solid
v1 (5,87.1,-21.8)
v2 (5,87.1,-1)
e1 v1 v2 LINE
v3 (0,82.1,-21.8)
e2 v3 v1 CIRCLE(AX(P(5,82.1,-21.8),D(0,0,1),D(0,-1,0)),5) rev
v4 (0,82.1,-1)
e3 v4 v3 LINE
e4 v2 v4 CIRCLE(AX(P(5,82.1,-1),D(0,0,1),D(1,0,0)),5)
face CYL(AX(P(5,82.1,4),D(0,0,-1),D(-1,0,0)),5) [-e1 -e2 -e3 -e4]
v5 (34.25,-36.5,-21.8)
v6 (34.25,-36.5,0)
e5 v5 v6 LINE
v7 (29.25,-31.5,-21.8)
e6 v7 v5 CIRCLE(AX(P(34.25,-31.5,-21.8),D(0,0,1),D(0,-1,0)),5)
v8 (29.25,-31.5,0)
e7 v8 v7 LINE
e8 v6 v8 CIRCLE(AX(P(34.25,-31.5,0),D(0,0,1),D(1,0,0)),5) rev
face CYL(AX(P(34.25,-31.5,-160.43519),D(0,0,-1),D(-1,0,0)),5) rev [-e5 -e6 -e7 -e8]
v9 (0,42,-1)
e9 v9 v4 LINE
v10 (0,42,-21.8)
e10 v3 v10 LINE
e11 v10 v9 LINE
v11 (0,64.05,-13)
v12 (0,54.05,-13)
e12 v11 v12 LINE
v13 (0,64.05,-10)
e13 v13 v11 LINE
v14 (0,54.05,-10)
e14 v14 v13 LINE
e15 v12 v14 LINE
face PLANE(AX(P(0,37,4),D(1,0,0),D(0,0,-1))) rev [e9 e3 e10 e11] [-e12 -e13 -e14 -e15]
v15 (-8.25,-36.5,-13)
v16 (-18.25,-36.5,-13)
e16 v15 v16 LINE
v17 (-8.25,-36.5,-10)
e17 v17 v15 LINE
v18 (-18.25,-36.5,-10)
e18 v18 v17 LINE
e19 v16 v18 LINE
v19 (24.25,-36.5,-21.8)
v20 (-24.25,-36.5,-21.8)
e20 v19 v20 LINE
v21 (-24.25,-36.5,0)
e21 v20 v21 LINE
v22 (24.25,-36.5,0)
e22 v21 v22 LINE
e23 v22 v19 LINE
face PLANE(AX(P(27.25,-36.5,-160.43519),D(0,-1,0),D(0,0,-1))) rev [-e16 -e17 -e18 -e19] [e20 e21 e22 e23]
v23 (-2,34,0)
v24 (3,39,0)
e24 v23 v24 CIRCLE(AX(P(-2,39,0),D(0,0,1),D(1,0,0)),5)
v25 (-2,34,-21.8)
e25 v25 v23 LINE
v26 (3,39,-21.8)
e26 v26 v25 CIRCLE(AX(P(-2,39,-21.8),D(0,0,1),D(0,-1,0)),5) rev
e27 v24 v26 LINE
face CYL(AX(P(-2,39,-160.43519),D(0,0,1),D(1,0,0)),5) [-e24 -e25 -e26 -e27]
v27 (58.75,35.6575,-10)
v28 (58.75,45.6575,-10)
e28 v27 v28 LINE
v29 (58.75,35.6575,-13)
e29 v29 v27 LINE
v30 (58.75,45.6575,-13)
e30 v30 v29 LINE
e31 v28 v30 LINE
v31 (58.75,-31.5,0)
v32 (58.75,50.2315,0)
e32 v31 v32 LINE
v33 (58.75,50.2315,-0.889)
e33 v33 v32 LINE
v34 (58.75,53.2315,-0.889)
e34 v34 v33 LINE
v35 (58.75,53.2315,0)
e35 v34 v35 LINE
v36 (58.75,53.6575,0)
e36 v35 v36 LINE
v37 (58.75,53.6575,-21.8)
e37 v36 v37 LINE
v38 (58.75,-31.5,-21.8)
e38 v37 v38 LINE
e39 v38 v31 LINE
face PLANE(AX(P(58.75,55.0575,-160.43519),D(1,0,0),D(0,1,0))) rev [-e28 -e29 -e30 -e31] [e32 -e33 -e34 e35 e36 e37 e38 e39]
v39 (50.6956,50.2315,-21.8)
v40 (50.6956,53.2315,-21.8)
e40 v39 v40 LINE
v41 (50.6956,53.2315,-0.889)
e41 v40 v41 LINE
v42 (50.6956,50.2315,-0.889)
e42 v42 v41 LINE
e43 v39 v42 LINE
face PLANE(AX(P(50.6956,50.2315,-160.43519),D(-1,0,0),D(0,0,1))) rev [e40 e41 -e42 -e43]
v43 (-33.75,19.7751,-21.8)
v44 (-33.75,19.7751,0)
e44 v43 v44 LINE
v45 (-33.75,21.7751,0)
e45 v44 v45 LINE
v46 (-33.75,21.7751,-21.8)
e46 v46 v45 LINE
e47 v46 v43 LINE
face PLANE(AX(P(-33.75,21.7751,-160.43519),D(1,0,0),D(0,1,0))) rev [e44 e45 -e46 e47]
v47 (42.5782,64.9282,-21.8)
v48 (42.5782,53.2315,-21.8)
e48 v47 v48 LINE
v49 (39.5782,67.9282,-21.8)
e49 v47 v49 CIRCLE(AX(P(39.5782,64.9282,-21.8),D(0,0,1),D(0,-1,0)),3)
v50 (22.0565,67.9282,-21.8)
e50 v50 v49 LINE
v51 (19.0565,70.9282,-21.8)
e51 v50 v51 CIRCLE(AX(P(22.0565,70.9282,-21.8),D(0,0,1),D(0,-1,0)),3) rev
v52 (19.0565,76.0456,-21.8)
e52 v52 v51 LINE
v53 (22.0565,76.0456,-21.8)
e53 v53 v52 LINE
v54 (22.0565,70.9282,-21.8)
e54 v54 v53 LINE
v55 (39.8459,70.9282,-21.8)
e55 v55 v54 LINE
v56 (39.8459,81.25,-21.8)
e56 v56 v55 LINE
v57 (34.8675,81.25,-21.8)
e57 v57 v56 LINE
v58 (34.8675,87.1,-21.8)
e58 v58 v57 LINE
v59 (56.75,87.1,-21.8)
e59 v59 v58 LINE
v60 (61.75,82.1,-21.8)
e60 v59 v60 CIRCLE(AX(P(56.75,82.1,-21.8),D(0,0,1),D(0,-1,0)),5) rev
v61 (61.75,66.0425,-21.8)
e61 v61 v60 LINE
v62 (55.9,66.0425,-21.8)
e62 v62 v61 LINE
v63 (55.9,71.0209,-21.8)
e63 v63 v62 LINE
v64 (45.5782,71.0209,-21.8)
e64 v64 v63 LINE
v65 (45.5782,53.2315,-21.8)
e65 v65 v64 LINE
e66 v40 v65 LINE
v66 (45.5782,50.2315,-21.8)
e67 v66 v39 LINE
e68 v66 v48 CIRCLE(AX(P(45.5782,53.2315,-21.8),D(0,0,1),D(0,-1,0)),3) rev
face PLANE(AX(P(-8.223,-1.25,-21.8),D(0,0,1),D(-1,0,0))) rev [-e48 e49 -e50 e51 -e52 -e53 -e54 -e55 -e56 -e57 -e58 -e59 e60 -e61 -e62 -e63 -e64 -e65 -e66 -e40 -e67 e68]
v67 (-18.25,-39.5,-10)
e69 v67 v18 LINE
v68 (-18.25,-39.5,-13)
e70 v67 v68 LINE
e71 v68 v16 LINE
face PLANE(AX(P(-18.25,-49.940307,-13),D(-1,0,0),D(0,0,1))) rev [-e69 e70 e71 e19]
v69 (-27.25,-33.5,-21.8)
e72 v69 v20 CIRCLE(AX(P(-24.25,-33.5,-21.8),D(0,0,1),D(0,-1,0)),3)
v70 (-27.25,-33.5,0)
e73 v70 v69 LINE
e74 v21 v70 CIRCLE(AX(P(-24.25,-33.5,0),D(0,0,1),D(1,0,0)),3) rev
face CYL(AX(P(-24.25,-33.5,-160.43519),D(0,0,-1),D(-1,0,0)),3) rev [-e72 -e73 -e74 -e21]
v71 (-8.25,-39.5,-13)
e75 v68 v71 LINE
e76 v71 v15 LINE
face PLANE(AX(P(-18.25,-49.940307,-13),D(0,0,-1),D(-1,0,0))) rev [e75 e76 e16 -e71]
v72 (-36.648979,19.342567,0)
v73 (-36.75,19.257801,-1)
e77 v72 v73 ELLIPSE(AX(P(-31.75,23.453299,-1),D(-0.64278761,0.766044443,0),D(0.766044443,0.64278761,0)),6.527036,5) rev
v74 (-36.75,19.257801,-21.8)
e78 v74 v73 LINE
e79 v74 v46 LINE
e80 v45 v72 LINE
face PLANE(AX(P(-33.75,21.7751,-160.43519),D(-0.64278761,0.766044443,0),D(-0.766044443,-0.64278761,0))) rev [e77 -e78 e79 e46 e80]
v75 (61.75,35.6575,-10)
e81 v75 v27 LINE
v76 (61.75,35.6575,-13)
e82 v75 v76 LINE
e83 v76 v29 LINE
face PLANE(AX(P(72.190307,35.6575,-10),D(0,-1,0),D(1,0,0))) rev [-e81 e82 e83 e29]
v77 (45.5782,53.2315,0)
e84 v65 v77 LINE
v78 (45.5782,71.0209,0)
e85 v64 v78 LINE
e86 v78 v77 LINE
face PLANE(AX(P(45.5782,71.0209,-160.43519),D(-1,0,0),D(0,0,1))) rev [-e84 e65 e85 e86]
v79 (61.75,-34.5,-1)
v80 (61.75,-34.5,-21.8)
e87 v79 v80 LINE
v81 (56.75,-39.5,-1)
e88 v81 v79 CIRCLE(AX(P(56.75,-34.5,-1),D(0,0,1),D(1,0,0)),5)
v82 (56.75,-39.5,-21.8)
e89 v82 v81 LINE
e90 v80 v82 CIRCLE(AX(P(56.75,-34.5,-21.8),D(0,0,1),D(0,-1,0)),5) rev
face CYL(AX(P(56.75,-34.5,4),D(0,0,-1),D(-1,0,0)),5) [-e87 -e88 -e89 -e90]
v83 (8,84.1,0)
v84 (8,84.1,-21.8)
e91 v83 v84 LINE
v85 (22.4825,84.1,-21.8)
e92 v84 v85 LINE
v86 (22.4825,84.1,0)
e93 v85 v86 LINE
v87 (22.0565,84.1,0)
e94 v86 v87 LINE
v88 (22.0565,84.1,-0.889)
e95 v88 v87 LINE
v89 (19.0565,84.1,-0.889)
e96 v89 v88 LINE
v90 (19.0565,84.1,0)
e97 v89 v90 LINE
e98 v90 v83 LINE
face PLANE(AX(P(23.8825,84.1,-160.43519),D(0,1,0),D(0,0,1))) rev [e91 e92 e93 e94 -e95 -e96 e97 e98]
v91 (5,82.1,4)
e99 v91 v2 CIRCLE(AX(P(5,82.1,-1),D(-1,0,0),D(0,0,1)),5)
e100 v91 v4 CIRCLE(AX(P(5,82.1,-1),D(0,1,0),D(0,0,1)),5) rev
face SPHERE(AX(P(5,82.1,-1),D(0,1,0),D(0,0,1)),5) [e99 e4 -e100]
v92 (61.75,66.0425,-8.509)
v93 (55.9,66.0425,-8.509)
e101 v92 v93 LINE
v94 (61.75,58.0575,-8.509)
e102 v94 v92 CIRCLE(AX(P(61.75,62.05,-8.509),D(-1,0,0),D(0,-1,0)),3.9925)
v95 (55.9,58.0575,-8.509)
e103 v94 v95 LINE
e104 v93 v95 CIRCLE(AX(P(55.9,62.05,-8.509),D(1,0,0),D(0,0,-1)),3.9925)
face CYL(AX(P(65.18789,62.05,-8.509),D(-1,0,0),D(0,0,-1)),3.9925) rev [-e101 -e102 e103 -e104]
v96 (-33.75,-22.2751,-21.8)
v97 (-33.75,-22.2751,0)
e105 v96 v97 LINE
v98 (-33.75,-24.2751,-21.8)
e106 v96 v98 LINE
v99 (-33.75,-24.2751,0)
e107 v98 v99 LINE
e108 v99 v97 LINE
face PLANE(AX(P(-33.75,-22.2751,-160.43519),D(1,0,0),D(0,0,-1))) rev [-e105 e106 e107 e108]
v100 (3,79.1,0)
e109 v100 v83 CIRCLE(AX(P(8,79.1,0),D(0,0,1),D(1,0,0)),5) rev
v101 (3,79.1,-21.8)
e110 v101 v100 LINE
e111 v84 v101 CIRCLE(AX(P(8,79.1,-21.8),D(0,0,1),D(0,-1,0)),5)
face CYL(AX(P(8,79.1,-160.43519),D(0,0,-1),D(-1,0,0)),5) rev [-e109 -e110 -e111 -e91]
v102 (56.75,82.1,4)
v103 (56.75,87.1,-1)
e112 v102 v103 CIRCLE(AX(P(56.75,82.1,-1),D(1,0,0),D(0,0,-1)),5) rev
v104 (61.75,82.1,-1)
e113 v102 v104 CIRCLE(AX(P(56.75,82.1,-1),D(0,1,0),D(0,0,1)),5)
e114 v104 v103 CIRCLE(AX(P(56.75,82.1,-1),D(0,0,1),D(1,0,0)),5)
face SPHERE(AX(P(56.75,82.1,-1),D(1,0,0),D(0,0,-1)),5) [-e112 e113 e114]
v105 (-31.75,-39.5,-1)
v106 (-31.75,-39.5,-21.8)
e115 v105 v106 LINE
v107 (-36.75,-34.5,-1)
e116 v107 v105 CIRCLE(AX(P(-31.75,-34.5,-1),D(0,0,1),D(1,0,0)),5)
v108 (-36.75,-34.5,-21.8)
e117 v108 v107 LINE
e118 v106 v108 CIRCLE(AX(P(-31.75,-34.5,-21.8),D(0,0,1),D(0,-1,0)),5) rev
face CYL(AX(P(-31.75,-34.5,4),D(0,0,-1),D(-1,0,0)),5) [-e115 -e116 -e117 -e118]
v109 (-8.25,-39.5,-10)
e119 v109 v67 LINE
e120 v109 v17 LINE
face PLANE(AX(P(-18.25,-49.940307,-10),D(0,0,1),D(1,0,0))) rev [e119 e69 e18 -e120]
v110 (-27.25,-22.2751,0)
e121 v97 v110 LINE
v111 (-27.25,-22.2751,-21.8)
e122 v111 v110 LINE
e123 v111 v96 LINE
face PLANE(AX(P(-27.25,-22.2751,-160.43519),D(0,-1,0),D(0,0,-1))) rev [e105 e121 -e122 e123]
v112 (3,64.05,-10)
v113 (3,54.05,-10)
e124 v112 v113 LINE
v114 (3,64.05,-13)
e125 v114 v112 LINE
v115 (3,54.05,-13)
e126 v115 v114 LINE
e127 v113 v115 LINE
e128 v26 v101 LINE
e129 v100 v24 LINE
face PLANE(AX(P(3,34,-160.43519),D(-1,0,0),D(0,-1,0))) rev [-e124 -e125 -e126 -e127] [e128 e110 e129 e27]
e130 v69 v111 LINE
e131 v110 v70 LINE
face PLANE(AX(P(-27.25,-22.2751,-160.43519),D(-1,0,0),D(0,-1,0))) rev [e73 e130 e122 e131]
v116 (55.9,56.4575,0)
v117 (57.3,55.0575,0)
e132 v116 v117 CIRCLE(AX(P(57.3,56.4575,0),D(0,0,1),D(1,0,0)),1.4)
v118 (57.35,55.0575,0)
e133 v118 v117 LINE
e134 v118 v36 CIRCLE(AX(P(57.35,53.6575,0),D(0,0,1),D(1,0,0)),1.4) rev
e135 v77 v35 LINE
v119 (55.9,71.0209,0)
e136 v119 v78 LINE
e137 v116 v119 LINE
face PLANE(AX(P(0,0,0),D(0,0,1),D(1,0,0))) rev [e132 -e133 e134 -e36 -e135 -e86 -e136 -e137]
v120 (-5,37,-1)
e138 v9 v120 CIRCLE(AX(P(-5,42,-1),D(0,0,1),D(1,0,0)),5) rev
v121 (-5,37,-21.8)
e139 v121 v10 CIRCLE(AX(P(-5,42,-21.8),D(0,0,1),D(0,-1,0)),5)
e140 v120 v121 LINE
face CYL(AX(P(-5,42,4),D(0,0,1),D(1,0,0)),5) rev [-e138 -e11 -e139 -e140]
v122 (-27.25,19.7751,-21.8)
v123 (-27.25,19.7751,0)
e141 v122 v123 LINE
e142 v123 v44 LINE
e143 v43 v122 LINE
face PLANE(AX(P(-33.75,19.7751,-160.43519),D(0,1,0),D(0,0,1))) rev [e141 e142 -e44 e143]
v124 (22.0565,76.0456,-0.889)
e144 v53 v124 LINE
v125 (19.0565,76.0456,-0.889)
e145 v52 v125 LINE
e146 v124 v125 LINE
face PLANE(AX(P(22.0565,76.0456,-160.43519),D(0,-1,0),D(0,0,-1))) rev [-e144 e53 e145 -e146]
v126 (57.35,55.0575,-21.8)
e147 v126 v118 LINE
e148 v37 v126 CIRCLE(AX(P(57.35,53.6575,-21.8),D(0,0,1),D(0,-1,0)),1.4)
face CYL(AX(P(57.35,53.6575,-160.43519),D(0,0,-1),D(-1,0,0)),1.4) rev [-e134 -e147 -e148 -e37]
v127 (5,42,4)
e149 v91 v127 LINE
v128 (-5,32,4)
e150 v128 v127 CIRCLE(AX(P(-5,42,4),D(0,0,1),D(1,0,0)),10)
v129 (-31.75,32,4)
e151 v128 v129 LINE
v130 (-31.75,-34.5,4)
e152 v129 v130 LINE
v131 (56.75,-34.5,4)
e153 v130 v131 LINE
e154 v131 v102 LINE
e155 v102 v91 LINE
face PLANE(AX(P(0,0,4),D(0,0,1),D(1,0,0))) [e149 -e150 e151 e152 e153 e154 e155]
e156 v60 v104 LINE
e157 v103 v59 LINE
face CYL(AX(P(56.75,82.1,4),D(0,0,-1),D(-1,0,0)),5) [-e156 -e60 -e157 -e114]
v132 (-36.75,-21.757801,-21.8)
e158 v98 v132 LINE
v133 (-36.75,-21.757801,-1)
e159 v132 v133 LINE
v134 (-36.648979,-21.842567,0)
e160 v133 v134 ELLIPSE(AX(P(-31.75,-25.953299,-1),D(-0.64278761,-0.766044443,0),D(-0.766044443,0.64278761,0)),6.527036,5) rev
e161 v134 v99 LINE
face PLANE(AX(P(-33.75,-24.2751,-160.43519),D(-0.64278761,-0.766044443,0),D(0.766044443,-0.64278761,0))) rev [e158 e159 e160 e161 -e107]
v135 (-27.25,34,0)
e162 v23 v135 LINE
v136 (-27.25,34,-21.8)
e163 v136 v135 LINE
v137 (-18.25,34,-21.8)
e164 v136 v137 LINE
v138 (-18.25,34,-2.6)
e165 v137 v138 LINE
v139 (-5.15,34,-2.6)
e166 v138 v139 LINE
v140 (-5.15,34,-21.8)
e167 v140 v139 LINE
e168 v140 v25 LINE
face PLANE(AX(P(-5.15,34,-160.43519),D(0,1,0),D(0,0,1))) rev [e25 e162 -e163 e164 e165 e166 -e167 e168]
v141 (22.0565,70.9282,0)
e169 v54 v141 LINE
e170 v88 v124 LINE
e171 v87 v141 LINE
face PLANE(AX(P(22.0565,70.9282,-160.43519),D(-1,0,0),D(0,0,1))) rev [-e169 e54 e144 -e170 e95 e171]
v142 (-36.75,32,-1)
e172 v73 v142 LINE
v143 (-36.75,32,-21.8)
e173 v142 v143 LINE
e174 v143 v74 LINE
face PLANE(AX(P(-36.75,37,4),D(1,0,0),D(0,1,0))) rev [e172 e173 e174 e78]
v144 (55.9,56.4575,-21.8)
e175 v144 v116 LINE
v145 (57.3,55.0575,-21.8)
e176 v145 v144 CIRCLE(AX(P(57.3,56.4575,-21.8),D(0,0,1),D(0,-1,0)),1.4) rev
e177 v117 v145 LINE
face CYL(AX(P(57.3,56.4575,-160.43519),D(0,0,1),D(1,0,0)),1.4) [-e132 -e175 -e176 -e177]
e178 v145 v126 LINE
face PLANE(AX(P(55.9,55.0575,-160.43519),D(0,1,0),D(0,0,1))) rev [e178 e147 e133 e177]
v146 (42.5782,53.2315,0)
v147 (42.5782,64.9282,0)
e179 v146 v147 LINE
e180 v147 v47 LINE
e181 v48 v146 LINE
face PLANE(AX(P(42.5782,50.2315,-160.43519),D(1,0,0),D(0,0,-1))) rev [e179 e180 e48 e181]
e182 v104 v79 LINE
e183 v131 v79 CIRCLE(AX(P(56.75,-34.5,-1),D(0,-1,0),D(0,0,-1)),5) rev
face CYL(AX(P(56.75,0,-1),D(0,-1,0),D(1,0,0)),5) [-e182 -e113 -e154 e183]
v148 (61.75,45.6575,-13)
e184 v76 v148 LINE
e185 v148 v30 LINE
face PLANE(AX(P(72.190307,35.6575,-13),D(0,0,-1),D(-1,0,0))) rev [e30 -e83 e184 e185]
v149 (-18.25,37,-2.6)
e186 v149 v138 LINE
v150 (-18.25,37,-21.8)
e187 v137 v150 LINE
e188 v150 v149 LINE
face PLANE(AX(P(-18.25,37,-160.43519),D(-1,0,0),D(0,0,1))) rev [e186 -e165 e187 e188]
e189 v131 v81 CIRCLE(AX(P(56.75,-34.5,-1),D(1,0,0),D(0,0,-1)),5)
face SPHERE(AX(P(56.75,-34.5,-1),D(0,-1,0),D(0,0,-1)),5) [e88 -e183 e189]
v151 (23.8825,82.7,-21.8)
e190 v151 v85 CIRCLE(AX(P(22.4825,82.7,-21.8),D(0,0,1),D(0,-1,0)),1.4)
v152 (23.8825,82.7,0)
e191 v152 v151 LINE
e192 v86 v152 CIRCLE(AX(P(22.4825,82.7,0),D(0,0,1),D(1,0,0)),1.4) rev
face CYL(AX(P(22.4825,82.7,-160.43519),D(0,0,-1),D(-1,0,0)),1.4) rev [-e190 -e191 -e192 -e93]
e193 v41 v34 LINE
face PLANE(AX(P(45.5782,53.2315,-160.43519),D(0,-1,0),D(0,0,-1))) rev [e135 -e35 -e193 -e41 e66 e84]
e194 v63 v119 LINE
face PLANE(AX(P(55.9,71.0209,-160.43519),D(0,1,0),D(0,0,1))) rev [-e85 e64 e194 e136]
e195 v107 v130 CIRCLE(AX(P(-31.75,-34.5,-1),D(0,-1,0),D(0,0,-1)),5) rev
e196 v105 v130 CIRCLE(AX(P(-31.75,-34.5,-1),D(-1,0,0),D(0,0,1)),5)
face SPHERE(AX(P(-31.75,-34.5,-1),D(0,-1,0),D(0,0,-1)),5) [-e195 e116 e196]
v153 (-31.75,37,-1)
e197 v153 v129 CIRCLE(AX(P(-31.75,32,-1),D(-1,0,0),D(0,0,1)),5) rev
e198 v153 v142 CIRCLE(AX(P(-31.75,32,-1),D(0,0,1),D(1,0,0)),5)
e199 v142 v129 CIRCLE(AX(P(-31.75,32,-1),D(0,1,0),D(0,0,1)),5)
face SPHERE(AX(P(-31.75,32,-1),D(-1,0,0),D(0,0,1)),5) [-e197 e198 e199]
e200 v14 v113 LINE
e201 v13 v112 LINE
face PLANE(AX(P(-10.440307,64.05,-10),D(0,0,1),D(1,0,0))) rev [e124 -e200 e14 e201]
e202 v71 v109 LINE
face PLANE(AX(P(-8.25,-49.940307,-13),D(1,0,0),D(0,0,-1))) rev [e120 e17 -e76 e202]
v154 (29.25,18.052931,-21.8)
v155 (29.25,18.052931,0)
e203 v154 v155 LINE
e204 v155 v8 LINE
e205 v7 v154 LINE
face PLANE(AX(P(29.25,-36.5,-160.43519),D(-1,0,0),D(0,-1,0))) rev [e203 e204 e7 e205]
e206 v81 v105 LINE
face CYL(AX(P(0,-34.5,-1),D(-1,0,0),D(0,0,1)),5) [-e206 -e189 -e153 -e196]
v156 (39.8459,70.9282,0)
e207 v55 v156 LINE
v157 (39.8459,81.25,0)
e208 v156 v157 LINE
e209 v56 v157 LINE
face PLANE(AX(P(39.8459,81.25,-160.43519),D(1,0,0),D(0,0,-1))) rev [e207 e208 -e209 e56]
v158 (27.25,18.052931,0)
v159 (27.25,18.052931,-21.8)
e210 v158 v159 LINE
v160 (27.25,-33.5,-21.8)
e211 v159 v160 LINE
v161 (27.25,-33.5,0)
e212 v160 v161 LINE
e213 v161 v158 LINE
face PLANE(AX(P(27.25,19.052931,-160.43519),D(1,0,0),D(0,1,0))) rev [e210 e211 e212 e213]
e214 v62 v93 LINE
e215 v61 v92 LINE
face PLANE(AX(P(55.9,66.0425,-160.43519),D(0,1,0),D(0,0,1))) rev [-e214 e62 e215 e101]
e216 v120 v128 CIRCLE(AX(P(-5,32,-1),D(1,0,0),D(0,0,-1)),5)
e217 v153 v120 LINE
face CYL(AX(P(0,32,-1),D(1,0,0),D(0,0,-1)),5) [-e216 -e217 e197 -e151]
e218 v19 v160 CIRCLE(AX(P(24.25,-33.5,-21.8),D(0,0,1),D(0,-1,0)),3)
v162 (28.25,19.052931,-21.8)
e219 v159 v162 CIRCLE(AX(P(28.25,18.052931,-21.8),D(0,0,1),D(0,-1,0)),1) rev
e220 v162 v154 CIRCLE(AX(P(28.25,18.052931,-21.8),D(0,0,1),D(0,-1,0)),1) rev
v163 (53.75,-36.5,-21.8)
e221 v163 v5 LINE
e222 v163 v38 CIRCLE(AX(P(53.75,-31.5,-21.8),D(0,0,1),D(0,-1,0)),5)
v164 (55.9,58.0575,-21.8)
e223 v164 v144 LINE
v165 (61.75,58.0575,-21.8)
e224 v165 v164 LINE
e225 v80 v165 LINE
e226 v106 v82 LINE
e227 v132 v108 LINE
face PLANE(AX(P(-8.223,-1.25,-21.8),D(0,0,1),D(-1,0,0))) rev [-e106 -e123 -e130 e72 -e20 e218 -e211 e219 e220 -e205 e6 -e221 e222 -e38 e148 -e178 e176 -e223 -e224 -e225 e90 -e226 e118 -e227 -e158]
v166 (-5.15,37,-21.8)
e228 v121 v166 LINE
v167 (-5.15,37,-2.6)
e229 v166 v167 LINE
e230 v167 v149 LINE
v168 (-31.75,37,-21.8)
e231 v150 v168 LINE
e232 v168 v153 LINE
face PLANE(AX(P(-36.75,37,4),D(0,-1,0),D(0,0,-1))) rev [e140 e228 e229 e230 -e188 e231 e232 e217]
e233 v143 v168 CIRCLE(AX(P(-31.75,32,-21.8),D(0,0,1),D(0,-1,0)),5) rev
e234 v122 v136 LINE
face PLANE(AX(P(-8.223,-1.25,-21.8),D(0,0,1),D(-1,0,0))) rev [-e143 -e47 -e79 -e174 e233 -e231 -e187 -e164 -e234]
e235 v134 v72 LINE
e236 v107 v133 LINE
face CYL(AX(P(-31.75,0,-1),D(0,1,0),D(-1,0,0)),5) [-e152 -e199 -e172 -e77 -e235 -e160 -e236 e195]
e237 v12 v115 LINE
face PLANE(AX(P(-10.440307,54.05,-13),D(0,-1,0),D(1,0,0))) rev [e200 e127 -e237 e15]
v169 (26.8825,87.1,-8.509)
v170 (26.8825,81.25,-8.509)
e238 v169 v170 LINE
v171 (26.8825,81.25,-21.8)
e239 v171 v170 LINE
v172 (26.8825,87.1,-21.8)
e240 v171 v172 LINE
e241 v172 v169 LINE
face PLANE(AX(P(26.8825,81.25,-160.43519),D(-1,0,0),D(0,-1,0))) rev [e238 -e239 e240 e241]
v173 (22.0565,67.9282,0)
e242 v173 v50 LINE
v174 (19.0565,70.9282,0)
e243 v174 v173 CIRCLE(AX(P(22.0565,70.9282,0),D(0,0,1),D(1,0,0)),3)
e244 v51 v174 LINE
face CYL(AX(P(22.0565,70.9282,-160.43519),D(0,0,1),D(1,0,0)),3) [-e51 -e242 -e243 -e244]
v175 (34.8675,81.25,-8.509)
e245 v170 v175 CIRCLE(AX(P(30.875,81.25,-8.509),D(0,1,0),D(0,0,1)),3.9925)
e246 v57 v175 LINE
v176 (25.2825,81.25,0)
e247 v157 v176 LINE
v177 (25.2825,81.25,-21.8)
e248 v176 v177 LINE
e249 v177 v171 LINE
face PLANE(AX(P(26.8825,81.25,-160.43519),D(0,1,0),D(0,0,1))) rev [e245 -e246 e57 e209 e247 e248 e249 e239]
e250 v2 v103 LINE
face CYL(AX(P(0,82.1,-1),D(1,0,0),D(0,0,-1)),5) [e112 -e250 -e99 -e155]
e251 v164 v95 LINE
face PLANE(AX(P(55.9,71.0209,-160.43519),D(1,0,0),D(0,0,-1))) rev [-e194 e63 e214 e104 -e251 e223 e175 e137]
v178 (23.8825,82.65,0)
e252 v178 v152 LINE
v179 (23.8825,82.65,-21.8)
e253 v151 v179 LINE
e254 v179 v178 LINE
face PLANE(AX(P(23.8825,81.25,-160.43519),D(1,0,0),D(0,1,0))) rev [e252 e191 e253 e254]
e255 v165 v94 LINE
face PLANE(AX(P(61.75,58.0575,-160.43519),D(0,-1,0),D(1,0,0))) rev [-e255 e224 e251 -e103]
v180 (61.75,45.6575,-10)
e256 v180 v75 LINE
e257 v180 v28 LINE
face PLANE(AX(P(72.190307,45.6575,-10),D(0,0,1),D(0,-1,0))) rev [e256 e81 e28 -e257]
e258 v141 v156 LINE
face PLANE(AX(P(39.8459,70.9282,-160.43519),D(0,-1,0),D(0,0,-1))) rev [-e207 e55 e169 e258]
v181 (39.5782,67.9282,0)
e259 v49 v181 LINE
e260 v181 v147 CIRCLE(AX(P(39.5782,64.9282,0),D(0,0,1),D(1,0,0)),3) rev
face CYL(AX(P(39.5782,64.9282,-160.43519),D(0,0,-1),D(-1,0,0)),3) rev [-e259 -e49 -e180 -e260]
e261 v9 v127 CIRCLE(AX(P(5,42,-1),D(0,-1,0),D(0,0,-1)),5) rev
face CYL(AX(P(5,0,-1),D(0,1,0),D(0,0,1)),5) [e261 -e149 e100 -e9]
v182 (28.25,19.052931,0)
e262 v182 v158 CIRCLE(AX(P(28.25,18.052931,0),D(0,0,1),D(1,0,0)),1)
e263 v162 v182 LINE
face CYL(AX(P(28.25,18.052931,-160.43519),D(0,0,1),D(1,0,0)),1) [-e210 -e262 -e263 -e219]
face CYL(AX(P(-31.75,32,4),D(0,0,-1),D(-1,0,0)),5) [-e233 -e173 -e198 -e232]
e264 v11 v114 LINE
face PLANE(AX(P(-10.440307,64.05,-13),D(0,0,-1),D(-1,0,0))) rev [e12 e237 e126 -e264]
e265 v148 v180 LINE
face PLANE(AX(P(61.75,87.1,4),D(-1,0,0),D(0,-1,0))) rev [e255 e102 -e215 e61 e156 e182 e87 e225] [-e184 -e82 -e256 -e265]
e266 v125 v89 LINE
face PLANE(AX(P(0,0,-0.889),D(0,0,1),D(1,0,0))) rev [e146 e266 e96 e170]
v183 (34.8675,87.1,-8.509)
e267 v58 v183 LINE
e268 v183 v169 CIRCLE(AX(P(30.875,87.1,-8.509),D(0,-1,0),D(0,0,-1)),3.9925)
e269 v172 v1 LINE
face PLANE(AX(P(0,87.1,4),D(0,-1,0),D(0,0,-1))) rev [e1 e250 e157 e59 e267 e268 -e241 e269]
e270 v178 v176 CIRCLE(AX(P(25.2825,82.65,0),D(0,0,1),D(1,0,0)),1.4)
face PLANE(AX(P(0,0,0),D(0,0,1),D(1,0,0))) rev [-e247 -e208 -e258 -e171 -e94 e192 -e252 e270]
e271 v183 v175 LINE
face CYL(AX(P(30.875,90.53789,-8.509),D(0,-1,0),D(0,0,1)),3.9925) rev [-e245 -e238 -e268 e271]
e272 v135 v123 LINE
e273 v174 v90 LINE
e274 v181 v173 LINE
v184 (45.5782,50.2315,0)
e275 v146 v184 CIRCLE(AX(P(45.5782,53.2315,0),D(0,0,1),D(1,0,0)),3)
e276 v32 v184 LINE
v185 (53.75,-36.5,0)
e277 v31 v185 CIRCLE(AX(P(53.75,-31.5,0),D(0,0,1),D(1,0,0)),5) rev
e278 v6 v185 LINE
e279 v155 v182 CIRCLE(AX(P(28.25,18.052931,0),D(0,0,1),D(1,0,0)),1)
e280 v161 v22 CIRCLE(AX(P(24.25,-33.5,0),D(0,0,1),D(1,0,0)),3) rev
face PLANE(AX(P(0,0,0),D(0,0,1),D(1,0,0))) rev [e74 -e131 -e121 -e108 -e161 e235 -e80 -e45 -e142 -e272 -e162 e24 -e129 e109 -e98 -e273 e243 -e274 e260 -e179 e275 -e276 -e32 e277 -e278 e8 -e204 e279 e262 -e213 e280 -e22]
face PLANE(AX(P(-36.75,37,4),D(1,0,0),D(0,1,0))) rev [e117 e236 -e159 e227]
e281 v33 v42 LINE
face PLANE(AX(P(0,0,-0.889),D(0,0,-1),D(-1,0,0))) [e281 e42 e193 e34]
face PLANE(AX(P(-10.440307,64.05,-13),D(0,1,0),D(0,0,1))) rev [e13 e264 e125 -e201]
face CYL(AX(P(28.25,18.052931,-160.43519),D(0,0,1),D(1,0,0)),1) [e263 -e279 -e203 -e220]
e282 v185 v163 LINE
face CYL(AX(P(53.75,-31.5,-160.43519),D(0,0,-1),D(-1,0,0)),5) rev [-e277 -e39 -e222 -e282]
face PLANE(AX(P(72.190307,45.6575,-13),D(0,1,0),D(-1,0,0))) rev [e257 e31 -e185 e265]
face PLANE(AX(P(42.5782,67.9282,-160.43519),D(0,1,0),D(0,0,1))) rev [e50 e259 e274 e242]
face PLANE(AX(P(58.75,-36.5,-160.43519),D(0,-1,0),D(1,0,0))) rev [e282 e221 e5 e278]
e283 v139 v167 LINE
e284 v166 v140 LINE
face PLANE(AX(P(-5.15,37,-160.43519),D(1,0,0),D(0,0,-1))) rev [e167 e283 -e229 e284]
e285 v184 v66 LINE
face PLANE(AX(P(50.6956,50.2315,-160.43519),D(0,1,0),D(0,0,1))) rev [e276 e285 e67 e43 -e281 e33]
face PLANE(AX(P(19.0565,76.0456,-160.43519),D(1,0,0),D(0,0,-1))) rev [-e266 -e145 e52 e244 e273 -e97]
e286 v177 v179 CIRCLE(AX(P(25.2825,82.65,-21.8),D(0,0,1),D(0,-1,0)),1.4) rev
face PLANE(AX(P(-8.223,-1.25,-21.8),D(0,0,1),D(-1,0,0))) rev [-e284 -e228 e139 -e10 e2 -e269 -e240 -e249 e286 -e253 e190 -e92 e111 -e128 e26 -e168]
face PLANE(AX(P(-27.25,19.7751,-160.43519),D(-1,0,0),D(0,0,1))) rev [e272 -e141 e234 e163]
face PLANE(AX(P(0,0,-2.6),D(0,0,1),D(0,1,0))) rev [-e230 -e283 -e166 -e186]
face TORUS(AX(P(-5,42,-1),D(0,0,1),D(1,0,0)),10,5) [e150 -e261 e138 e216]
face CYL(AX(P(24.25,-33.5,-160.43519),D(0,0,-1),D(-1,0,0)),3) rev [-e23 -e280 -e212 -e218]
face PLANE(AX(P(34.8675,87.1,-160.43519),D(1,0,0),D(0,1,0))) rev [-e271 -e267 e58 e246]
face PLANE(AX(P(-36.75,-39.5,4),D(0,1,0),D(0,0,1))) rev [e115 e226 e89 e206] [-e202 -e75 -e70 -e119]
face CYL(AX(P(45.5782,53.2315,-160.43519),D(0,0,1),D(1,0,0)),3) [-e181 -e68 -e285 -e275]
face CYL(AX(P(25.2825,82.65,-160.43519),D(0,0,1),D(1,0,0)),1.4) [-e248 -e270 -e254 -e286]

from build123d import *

# Parameters (mm, degrees)
BOSS_EXTRUDE1_DEPTH = 4
BOSS_EXTRUDE2_DEPTH = 21.8
BOSS_EXTRUDE3_START = 55.9
BOSS_EXTRUDE3_DEPTH = 5.85
BOSS_EXTRUDE4_START = 81.25
BOSS_EXTRUDE4_DEPTH = 5.85
SKETCH5_W           = 13.1
SKETCH5_H           = 3
BOSS_EXTRUDE5_DEPTH = 2.6
FILLET1_R           = 5
FILLET2_R           = 3
SKETCH6_W           = 3
SKETCH6_H           = 8.0544
SKETCH6_W_2         = 8.0544
SKETCH6_H_2         = 3
BOSS_EXTRUDE6_DEPTH = 0.889
FILLET3_R           = 3
FILLET4_R           = 1.4
FILLET5_R           = 1
SKETCH8_W           = 3
SKETCH8_H           = 10
CUT_EXTRUDE1_DEPTH  = 3
SKETCH9_W           = 3
SKETCH9_H           = 10
CUT_EXTRUDE2_DEPTH  = 3
SKETCH10_W          = 10
SKETCH10_H          = 3
CUT_EXTRUDE3_DEPTH  = 3


# Read off the part's stored shape, not the designer's step: Boss-Extrude3, Boss-Extrude4
# Some blends are built 0.0001 mm under size
with BuildPart() as part:
    # Sketch1 → Boss-Extrude1 (new body)
    with BuildSketch(Plane.XY):
        Polygon((-36.75, 37), (-36.75, -39.5), (61.75, -39.5), (61.75, 87.1), (0, 87.1), (0, 37), align=None)
    extrude(amount=BOSS_EXTRUDE1_DEPTH)

    # Sketch2 → Boss-Extrude2 (add)
    with BuildSketch(Plane(origin=(0, 0, 0), x_dir=(-1, 0, 0), z_dir=(0, 0, -1))):
        Polygon((5.15, 34), (-3, 34), (-3, 84.1), (-23.8825, 84.1), (-23.8825, 81.25), (-26.8825, 81.25), (-26.8825, 87.1), (0, 87.1), (0, 37), (5.15, 37), align=None)
        Polygon((-34.8675, 87.1), (-34.8675, 81.25), (-39.8459, 81.25), (-39.8459, 70.9282), (-22.0565, 70.9282), (-22.0565, 76.0456), (-19.0565, 76.0456), (-19.0565, 67.9282), (-42.5782, 67.9282), (-42.5782, 50.2315), (-50.6956, 50.2315), (-50.6956, 53.2315), (-45.5782, 53.2315), (-45.5782, 71.0209), (-55.9, 71.0209), (-55.9, 66.0425), (-61.75, 66.0425), (-61.75, 87.1), align=None)
        Polygon((-61.75, 58.0575), (-55.9, 58.0575), (-55.9, 55.0575), (-58.75, 55.0575), (-58.75, -36.5), (-29.25, -36.5), (-29.25, 19.052930988), (-27.25, 19.052930988), (-27.25, -36.5), (27.25, -36.5), (27.25, -22.2751), (33.75, -22.2751), (33.75, -24.2751), (36.75, -21.757801106), (36.75, -39.5), (-61.75, -39.5), align=None)
        Polygon((18.25, 37), (18.25, 34), (27.25, 34), (27.25, 19.7751), (33.75, 19.7751), (33.75, 21.7751), (36.75, 19.257801106), (36.75, 37), align=None)
    extrude(amount=BOSS_EXTRUDE2_DEPTH)

    # Boss-Extrude3 outline → Boss-Extrude3 (add)
    with BuildSketch(Plane.YZ.offset(BOSS_EXTRUDE3_START)):
        with BuildLine():
            Line((58.0575, 0), (58.0575, -8.509))
            ThreePointArc((58.0575, -8.509), (62.05, -4.5165), (66.0425, -8.509))
            Line((66.0425, -8.509), (66.0425, 0))
            Line((66.0425, 0), (58.0575, 0))
        make_face()
    extrude(amount=BOSS_EXTRUDE3_DEPTH)

    # Boss-Extrude4 outline → Boss-Extrude4 (add)
    with BuildSketch(Plane(origin=(0, 0, 0), x_dir=(1, 0, 0), z_dir=(0, 1, 0)).offset(BOSS_EXTRUDE4_START)):
        with BuildLine():
            Line((34.8675, 0), (34.8675, 8.509))
            ThreePointArc((34.8675, 8.509), (30.875, 4.5165), (26.8825, 8.509))
            Line((26.8825, 8.509), (26.8825, 0))
            Line((26.8825, 0), (34.8675, 0))
        make_face()
    extrude(amount=BOSS_EXTRUDE4_DEPTH)

    # Sketch5 → Boss-Extrude5 (add)
    with BuildSketch(Plane(origin=(0, 0, 0), x_dir=(-1, 0, 0), z_dir=(0, 0, -1))):
        with Locations((11.7, 35.5)):
            Rectangle(SKETCH5_W, SKETCH5_H)
    extrude(amount=BOSS_EXTRUDE5_DEPTH)

    # Fillet1
    # the kernel refuses this fillet: 5 mm, written as the material it adds along each edge
    with BuildSketch(Plane(origin=(0, 37, 4), x_dir=(0, 1, 0), z_dir=(0, 0, -1))) as fillet1_piece_1:
        with BuildLine():
            CenterArc((FILLET1_R, -FILLET1_R), FILLET1_R, 90, 90)
            Line((0, -FILLET1_R), (0, 0))
            Line((0, 0), (FILLET1_R, 0))
        make_face()
    extrude(amount=25.8)
    with BuildSketch(Plane(origin=(29.25, -36.5, 12.5), x_dir=(1, 0, 0), z_dir=(0, 0, -1))) as fillet1_piece_2_section:
        with BuildLine():
            CenterArc((FILLET1_R, -FILLET1_R), FILLET1_R, 90, 90)
            Line((0, -FILLET1_R), (0, 0))
            Line((0, 0), (FILLET1_R, 0))
        make_face()
    fillet1_piece_2 = extrude(amount=34.3, mode=Mode.PRIVATE)
    fillet1_piece_2 = split(fillet1_piece_2, bisect_by=Plane(origin=(30.366839695, -35.383160305, 4), z_dir=(0, 0, -1)), keep=Keep.TOP, mode=Mode.PRIVATE)
    add(fillet1_piece_2)
    with BuildSketch(Plane(origin=(58.75, -36.5, 12.5), x_dir=(0, 1, 0), z_dir=(0, 0, -1))) as fillet1_piece_3_section:
        with BuildLine():
            CenterArc((FILLET1_R, -FILLET1_R), FILLET1_R, 90, 90)
            Line((0, -FILLET1_R), (0, 0))
            Line((0, 0), (FILLET1_R, 0))
        make_face()
    fillet1_piece_3 = extrude(amount=34.3, mode=Mode.PRIVATE)
    fillet1_piece_3 = split(fillet1_piece_3, bisect_by=Plane(origin=(57.633160305, -35.383160305, 4), z_dir=(0, 0, -1)), keep=Keep.TOP, mode=Mode.PRIVATE)
    add(fillet1_piece_3)
    with BuildSketch(Plane(origin=(3, 84.1, 12.5), x_dir=(1, 0, 0), z_dir=(0, 0, -1))) as fillet1_piece_4_section:
        with BuildLine():
            CenterArc((FILLET1_R, FILLET1_R), FILLET1_R, 180, 90)
            Line((0, FILLET1_R), (0, 0))
            Line((0, 0), (FILLET1_R, 0))
        make_face()
    fillet1_piece_4 = extrude(amount=34.3, mode=Mode.PRIVATE)
    fillet1_piece_4 = split(fillet1_piece_4, bisect_by=Plane(origin=(4.116839695, 82.983160305, 4), z_dir=(0, 0, -1)), keep=Keep.TOP, mode=Mode.PRIVATE)
    add(fillet1_piece_4)
    # the kernel refuses this fillet: 5 mm, written as the material it takes off along each edge
    with BuildSketch(Plane(origin=(56.75, 82.1, -1), x_dir=(1, 0, 0), z_dir=(0, 0, 1))) as fillet1_2_piece_1_section:
        Polygon((0, 0), (FILLET1_R * 1.02, 0), (FILLET1_R * 1.02, FILLET1_R * 1.02), (0, FILLET1_R * 1.02), align=None)
    fillet1_2_piece_1 = extrude(amount=FILLET1_R * 1.02, mode=Mode.PRIVATE)
    fillet1_2_piece_1 = fillet1_2_piece_1 - Plane(origin=(56.75, 82.1, -1), x_dir=(-0.7071067811865475, -0.7071067811865477, 0), z_dir=(0, 0, 1)) * Sphere(FILLET1_R, mode=Mode.PRIVATE)
    add(fillet1_2_piece_1, mode=Mode.SUBTRACT)
    with BuildSketch(Plane(origin=(56.75, -34.5, -1), x_dir=(0, -1, 0), z_dir=(0, 0, 1))) as fillet1_2_piece_2_section:
        Polygon((0, 0), (FILLET1_R * 1.02, 0), (FILLET1_R * 1.02, FILLET1_R * 1.02), (0, FILLET1_R * 1.02), align=None)
    fillet1_2_piece_2 = extrude(amount=FILLET1_R * 1.02, mode=Mode.PRIVATE)
    fillet1_2_piece_2 = fillet1_2_piece_2 - Plane(origin=(56.75, -34.5, -1), x_dir=(-0.7071067811865476, 0.7071067811865475, 0), z_dir=(0, 0, 1)) * Sphere(FILLET1_R, mode=Mode.PRIVATE)
    add(fillet1_2_piece_2, mode=Mode.SUBTRACT)
    with BuildSketch(Plane(origin=(-31.75, -34.5, -1), x_dir=(0, 0, 1), z_dir=(-1, 0, 0))) as fillet1_2_piece_3_section:
        Polygon((0, 0), (FILLET1_R * 1.02, 0), (FILLET1_R * 1.02, -FILLET1_R * 1.02), (0, -FILLET1_R * 1.02), align=None)
    fillet1_2_piece_3 = extrude(amount=FILLET1_R * 1.02, mode=Mode.PRIVATE)
    fillet1_2_piece_3 = fillet1_2_piece_3 - Plane(origin=(-31.75, -34.5, -1), x_dir=(0, 0.7071067811865475, -0.7071067811865475), z_dir=(-1, 0, 0)) * Sphere(FILLET1_R, mode=Mode.PRIVATE)
    add(fillet1_2_piece_3, mode=Mode.SUBTRACT)
    with BuildSketch(Plane(origin=(56.75, 87.1, 4), x_dir=(0, -1, 0), z_dir=(-1, 0, 0))) as fillet1_2_piece_4:
        with BuildLine():
            CenterArc((FILLET1_R, -FILLET1_R), FILLET1_R, 90, 90)
            Line((0, -FILLET1_R), (0, 0))
            Line((0, 0), (FILLET1_R, 0))
        make_face()
    extrude(amount=69.25, mode=Mode.SUBTRACT)
    with BuildSketch(Plane(origin=(61.75, -34.5, 4), x_dir=(-1, 0, 0), z_dir=(0, 1, 0))) as fillet1_2_piece_5:
        with BuildLine():
            CenterArc((FILLET1_R, -FILLET1_R), FILLET1_R, 90, 90)
            Line((0, -FILLET1_R), (0, 0))
            Line((0, 0), (FILLET1_R, 0))
        make_face()
    extrude(amount=116.6, mode=Mode.SUBTRACT)
    with BuildSketch(Plane(origin=(-31.75, -39.5, 4), x_dir=(0, 1, 0), z_dir=(1, 0, 0))) as fillet1_2_piece_6:
        with BuildLine():
            CenterArc((FILLET1_R, -FILLET1_R), FILLET1_R, 90, 90)
            Line((0, -FILLET1_R), (0, 0))
            Line((0, 0), (FILLET1_R, 0))
        make_face()
    extrude(amount=88.5, mode=Mode.SUBTRACT)
    with BuildSketch(Plane(origin=(-36.75, 49.5, 4), x_dir=(0, 0, -1), z_dir=(0, -1, 0))) as fillet1_2_piece_7:
        with BuildLine():
            CenterArc((FILLET1_R, FILLET1_R), FILLET1_R, 180, 90)
            Line((0, FILLET1_R), (0, 0))
            Line((0, 0), (FILLET1_R, 0))
        make_face()
    extrude(amount=84, mode=Mode.SUBTRACT)
    with BuildSketch(Plane(origin=(-36.75, -39.5, -34.3), x_dir=(0, 1, 0), z_dir=(0, 0, 1)), Plane(origin=(61.75, 87.1, -34.3), x_dir=(0, -1, 0), z_dir=(0, 0, 1)), Plane(origin=(61.75, -39.5, -34.3), x_dir=(-1, 0, 0), z_dir=(0, 0, 1))) as fillet1_2_piece_8:
        with BuildLine():
            CenterArc((FILLET1_R, -FILLET1_R), FILLET1_R, 90, 90)
            Line((0, -FILLET1_R), (0, 0))
            Line((0, 0), (FILLET1_R, 0))
        make_face()
    extrude(amount=33.3, mode=Mode.SUBTRACT)
    with BuildSketch(Plane(origin=(-36.75, 37, 16.5), x_dir=(0, -1, 0), z_dir=(0, 0, -1))) as fillet1_2_piece_9:
        with BuildLine():
            CenterArc((FILLET1_R, -FILLET1_R), FILLET1_R, 90, 90)
            Line((0, -FILLET1_R), (0, 0))
            Line((0, 0), (FILLET1_R, 0))
        make_face()
    extrude(amount=50.8, mode=Mode.SUBTRACT)
    with BuildSketch(Plane(origin=(0, 87.1, 16.5), x_dir=(1, 0, 0), z_dir=(0, 0, -1))) as fillet1_2_piece_10:
        with BuildLine():
            CenterArc((FILLET1_R, FILLET1_R), FILLET1_R, 180, 90)
            Line((0, FILLET1_R), (0, 0))
            Line((0, 0), (FILLET1_R, 0))
        make_face()
    extrude(amount=50.8, mode=Mode.SUBTRACT)
    with BuildSketch(Plane(origin=(3, 34, 0), x_dir=(-1, 0, 0), z_dir=(0, 0, -1))) as fillet1_2_piece_11:
        with BuildLine():
            CenterArc((FILLET1_R, FILLET1_R), FILLET1_R, 180, 90)
            Line((0, FILLET1_R), (0, 0))
            Line((0, 0), (FILLET1_R, 0))
        make_face()
    extrude(amount=34.3, mode=Mode.SUBTRACT)
    # the kernel refuses this fillet: 5 mm, written as the material it takes off along each edge
    with BuildSketch(Plane(origin=(-31.75, 32, -1), x_dir=(0, 0, 1), z_dir=(0, 1, 0))) as fillet1_3_piece_1_section:
        Polygon((0, 0), (FILLET1_R * 1.02, 0), (FILLET1_R * 1.02, -FILLET1_R * 1.02), (0, -FILLET1_R * 1.02), align=None)
    fillet1_3_piece_1 = extrude(amount=FILLET1_R * 1.02, mode=Mode.PRIVATE)
    fillet1_3_piece_1 = fillet1_3_piece_1 - Plane(origin=(-31.75, 32, -1), x_dir=(0.7071067811865475, 0, -0.7071067811865475), z_dir=(0, 1, 0)) * Sphere(FILLET1_R, mode=Mode.PRIVATE)
    add(fillet1_3_piece_1, mode=Mode.SUBTRACT)
    with BuildSketch(Plane(origin=(5, 82.1, -1), x_dir=(-1, 0, 0), z_dir=(0, 0, 1))) as fillet1_3_piece_2_section:
        Polygon((0, 0), (FILLET1_R * 1.02, 0), (FILLET1_R * 1.02, -FILLET1_R * 1.02), (0, -FILLET1_R * 1.02), align=None)
    fillet1_3_piece_2 = extrude(amount=FILLET1_R * 1.02, mode=Mode.PRIVATE)
    fillet1_3_piece_2 = fillet1_3_piece_2 - Plane(origin=(5, 82.1, -1), x_dir=(0.7071067811865475, -0.7071067811865475, 0), z_dir=(0, 0, 1)) * Sphere(FILLET1_R, mode=Mode.PRIVATE)
    add(fillet1_3_piece_2, mode=Mode.SUBTRACT)
    with BuildSketch(Plane(origin=(0, 82.1, 4), x_dir=(1, 0, 0), z_dir=(0, -1, 0))) as fillet1_3_piece_3:
        with BuildLine():
            CenterArc((FILLET1_R, -FILLET1_R), FILLET1_R, 90, 90)
            Line((0, -FILLET1_R), (0, 0))
            Line((0, 0), (FILLET1_R, 0))
        make_face()
    extrude(amount=40.1, mode=Mode.SUBTRACT)
    with BuildSketch(Plane(origin=(-5, 37, 4), x_dir=(0, 0, -1), z_dir=(-1, 0, 0))) as fillet1_3_piece_4:
        with BuildLine():
            CenterArc((FILLET1_R, FILLET1_R), FILLET1_R, 180, 90)
            Line((0, FILLET1_R), (0, 0))
            Line((0, 0), (FILLET1_R, 0))
        make_face()
    extrude(amount=26.75, mode=Mode.SUBTRACT)
    with BuildSketch(Plane(origin=(-5, 42, 4), x_dir=(1, 0, 0), z_dir=(0, 1, 0))) as fillet1_3_piece_5:
        with BuildLine():
            CenterArc((5 + FILLET1_R, FILLET1_R), FILLET1_R, 180, 90)
            Line((5, FILLET1_R), (5, 0))
            Line((5, 0), (5 + FILLET1_R, 0))
        make_face()
    revolve(axis=Axis((-5, 42, 4), (0, 0, -1)), revolution_arc=90, mode=Mode.SUBTRACT)

    # Fillet2
    fillet2_edges = [part.edges().sort_by_distance(p)[0] for p in [
        (27.25, -36.5, -10.9),
        (-27.25, -36.5, -10.9),
    ]]
    fillet(fillet2_edges, radius=FILLET2_R)

    # Sketch6 → Boss-Extrude6 (add)
    with BuildSketch(Plane(origin=(0, 0, 0), x_dir=(-1, 0, 0), z_dir=(0, 0, -1))):
        with Locations((-20.5565, 80.0728)):
            Rectangle(SKETCH6_W, SKETCH6_H)
        with Locations((-54.7228, 51.7315)):
            Rectangle(SKETCH6_W_2, SKETCH6_H_2)
    extrude(amount=BOSS_EXTRUDE6_DEPTH)

    # Fillet3
    fillet3_edges = [part.edges().sort_by_distance(p)[0] for p in [
        (19.0565, 67.9282, -10.9),
        (42.5782, 67.9282, -10.9),
        (42.5782, 50.2315, -10.9),
    ]]
    fillet(fillet3_edges, radius=FILLET3_R)

    # Fillet4
    fillet4_edges = [part.edges().sort_by_distance(p)[0] for p in [
        (23.8825, 84.1, -10.9),
        (23.8825, 81.25, -10.9),
        (55.9, 55.0575, -10.9),
        (58.75, 55.0575, -10.9),
    ]]
    fillet(fillet4_edges, radius=FILLET4_R)

    # Fillet5
    fillet5_edges = [part.edges().sort_by_distance(p)[0] for p in [
        (29.25, 19.052930988, -10.9),
        (27.25, 19.052930988, -10.9),
    ]]
    fillet(fillet5_edges, radius=FILLET5_R - 0.0001)  # a hair under: the kernel refuses the full size

    # Sketch8 → Cut-Extrude1 (cut)
    with BuildSketch(Plane.ZY.offset(-58.75)):
        with Locations((-11.5, 40.6575)):
            Rectangle(SKETCH8_W, SKETCH8_H)
    extrude(amount=-CUT_EXTRUDE1_DEPTH, mode=Mode.SUBTRACT)

    # Sketch9 → Cut-Extrude2 (cut)
    with BuildSketch(Plane(origin=(3, 0, 0), x_dir=(0, 0, -1), z_dir=(1, 0, 0))):
        with Locations((11.5, 59.05)):
            Rectangle(SKETCH9_W, SKETCH9_H)
    extrude(amount=-CUT_EXTRUDE2_DEPTH, mode=Mode.SUBTRACT)

    # Sketch10 → Cut-Extrude3 (cut)
    with BuildSketch(Plane(origin=(0, -36.5, 0), x_dir=(1, 0, 0), z_dir=(0, 1, 0))):
        with Locations((-13.25, 11.5)):
            Rectangle(SKETCH10_W, SKETCH10_H)
    extrude(amount=-CUT_EXTRUDE3_DEPTH, mode=Mode.SUBTRACT)


solid = part.part
